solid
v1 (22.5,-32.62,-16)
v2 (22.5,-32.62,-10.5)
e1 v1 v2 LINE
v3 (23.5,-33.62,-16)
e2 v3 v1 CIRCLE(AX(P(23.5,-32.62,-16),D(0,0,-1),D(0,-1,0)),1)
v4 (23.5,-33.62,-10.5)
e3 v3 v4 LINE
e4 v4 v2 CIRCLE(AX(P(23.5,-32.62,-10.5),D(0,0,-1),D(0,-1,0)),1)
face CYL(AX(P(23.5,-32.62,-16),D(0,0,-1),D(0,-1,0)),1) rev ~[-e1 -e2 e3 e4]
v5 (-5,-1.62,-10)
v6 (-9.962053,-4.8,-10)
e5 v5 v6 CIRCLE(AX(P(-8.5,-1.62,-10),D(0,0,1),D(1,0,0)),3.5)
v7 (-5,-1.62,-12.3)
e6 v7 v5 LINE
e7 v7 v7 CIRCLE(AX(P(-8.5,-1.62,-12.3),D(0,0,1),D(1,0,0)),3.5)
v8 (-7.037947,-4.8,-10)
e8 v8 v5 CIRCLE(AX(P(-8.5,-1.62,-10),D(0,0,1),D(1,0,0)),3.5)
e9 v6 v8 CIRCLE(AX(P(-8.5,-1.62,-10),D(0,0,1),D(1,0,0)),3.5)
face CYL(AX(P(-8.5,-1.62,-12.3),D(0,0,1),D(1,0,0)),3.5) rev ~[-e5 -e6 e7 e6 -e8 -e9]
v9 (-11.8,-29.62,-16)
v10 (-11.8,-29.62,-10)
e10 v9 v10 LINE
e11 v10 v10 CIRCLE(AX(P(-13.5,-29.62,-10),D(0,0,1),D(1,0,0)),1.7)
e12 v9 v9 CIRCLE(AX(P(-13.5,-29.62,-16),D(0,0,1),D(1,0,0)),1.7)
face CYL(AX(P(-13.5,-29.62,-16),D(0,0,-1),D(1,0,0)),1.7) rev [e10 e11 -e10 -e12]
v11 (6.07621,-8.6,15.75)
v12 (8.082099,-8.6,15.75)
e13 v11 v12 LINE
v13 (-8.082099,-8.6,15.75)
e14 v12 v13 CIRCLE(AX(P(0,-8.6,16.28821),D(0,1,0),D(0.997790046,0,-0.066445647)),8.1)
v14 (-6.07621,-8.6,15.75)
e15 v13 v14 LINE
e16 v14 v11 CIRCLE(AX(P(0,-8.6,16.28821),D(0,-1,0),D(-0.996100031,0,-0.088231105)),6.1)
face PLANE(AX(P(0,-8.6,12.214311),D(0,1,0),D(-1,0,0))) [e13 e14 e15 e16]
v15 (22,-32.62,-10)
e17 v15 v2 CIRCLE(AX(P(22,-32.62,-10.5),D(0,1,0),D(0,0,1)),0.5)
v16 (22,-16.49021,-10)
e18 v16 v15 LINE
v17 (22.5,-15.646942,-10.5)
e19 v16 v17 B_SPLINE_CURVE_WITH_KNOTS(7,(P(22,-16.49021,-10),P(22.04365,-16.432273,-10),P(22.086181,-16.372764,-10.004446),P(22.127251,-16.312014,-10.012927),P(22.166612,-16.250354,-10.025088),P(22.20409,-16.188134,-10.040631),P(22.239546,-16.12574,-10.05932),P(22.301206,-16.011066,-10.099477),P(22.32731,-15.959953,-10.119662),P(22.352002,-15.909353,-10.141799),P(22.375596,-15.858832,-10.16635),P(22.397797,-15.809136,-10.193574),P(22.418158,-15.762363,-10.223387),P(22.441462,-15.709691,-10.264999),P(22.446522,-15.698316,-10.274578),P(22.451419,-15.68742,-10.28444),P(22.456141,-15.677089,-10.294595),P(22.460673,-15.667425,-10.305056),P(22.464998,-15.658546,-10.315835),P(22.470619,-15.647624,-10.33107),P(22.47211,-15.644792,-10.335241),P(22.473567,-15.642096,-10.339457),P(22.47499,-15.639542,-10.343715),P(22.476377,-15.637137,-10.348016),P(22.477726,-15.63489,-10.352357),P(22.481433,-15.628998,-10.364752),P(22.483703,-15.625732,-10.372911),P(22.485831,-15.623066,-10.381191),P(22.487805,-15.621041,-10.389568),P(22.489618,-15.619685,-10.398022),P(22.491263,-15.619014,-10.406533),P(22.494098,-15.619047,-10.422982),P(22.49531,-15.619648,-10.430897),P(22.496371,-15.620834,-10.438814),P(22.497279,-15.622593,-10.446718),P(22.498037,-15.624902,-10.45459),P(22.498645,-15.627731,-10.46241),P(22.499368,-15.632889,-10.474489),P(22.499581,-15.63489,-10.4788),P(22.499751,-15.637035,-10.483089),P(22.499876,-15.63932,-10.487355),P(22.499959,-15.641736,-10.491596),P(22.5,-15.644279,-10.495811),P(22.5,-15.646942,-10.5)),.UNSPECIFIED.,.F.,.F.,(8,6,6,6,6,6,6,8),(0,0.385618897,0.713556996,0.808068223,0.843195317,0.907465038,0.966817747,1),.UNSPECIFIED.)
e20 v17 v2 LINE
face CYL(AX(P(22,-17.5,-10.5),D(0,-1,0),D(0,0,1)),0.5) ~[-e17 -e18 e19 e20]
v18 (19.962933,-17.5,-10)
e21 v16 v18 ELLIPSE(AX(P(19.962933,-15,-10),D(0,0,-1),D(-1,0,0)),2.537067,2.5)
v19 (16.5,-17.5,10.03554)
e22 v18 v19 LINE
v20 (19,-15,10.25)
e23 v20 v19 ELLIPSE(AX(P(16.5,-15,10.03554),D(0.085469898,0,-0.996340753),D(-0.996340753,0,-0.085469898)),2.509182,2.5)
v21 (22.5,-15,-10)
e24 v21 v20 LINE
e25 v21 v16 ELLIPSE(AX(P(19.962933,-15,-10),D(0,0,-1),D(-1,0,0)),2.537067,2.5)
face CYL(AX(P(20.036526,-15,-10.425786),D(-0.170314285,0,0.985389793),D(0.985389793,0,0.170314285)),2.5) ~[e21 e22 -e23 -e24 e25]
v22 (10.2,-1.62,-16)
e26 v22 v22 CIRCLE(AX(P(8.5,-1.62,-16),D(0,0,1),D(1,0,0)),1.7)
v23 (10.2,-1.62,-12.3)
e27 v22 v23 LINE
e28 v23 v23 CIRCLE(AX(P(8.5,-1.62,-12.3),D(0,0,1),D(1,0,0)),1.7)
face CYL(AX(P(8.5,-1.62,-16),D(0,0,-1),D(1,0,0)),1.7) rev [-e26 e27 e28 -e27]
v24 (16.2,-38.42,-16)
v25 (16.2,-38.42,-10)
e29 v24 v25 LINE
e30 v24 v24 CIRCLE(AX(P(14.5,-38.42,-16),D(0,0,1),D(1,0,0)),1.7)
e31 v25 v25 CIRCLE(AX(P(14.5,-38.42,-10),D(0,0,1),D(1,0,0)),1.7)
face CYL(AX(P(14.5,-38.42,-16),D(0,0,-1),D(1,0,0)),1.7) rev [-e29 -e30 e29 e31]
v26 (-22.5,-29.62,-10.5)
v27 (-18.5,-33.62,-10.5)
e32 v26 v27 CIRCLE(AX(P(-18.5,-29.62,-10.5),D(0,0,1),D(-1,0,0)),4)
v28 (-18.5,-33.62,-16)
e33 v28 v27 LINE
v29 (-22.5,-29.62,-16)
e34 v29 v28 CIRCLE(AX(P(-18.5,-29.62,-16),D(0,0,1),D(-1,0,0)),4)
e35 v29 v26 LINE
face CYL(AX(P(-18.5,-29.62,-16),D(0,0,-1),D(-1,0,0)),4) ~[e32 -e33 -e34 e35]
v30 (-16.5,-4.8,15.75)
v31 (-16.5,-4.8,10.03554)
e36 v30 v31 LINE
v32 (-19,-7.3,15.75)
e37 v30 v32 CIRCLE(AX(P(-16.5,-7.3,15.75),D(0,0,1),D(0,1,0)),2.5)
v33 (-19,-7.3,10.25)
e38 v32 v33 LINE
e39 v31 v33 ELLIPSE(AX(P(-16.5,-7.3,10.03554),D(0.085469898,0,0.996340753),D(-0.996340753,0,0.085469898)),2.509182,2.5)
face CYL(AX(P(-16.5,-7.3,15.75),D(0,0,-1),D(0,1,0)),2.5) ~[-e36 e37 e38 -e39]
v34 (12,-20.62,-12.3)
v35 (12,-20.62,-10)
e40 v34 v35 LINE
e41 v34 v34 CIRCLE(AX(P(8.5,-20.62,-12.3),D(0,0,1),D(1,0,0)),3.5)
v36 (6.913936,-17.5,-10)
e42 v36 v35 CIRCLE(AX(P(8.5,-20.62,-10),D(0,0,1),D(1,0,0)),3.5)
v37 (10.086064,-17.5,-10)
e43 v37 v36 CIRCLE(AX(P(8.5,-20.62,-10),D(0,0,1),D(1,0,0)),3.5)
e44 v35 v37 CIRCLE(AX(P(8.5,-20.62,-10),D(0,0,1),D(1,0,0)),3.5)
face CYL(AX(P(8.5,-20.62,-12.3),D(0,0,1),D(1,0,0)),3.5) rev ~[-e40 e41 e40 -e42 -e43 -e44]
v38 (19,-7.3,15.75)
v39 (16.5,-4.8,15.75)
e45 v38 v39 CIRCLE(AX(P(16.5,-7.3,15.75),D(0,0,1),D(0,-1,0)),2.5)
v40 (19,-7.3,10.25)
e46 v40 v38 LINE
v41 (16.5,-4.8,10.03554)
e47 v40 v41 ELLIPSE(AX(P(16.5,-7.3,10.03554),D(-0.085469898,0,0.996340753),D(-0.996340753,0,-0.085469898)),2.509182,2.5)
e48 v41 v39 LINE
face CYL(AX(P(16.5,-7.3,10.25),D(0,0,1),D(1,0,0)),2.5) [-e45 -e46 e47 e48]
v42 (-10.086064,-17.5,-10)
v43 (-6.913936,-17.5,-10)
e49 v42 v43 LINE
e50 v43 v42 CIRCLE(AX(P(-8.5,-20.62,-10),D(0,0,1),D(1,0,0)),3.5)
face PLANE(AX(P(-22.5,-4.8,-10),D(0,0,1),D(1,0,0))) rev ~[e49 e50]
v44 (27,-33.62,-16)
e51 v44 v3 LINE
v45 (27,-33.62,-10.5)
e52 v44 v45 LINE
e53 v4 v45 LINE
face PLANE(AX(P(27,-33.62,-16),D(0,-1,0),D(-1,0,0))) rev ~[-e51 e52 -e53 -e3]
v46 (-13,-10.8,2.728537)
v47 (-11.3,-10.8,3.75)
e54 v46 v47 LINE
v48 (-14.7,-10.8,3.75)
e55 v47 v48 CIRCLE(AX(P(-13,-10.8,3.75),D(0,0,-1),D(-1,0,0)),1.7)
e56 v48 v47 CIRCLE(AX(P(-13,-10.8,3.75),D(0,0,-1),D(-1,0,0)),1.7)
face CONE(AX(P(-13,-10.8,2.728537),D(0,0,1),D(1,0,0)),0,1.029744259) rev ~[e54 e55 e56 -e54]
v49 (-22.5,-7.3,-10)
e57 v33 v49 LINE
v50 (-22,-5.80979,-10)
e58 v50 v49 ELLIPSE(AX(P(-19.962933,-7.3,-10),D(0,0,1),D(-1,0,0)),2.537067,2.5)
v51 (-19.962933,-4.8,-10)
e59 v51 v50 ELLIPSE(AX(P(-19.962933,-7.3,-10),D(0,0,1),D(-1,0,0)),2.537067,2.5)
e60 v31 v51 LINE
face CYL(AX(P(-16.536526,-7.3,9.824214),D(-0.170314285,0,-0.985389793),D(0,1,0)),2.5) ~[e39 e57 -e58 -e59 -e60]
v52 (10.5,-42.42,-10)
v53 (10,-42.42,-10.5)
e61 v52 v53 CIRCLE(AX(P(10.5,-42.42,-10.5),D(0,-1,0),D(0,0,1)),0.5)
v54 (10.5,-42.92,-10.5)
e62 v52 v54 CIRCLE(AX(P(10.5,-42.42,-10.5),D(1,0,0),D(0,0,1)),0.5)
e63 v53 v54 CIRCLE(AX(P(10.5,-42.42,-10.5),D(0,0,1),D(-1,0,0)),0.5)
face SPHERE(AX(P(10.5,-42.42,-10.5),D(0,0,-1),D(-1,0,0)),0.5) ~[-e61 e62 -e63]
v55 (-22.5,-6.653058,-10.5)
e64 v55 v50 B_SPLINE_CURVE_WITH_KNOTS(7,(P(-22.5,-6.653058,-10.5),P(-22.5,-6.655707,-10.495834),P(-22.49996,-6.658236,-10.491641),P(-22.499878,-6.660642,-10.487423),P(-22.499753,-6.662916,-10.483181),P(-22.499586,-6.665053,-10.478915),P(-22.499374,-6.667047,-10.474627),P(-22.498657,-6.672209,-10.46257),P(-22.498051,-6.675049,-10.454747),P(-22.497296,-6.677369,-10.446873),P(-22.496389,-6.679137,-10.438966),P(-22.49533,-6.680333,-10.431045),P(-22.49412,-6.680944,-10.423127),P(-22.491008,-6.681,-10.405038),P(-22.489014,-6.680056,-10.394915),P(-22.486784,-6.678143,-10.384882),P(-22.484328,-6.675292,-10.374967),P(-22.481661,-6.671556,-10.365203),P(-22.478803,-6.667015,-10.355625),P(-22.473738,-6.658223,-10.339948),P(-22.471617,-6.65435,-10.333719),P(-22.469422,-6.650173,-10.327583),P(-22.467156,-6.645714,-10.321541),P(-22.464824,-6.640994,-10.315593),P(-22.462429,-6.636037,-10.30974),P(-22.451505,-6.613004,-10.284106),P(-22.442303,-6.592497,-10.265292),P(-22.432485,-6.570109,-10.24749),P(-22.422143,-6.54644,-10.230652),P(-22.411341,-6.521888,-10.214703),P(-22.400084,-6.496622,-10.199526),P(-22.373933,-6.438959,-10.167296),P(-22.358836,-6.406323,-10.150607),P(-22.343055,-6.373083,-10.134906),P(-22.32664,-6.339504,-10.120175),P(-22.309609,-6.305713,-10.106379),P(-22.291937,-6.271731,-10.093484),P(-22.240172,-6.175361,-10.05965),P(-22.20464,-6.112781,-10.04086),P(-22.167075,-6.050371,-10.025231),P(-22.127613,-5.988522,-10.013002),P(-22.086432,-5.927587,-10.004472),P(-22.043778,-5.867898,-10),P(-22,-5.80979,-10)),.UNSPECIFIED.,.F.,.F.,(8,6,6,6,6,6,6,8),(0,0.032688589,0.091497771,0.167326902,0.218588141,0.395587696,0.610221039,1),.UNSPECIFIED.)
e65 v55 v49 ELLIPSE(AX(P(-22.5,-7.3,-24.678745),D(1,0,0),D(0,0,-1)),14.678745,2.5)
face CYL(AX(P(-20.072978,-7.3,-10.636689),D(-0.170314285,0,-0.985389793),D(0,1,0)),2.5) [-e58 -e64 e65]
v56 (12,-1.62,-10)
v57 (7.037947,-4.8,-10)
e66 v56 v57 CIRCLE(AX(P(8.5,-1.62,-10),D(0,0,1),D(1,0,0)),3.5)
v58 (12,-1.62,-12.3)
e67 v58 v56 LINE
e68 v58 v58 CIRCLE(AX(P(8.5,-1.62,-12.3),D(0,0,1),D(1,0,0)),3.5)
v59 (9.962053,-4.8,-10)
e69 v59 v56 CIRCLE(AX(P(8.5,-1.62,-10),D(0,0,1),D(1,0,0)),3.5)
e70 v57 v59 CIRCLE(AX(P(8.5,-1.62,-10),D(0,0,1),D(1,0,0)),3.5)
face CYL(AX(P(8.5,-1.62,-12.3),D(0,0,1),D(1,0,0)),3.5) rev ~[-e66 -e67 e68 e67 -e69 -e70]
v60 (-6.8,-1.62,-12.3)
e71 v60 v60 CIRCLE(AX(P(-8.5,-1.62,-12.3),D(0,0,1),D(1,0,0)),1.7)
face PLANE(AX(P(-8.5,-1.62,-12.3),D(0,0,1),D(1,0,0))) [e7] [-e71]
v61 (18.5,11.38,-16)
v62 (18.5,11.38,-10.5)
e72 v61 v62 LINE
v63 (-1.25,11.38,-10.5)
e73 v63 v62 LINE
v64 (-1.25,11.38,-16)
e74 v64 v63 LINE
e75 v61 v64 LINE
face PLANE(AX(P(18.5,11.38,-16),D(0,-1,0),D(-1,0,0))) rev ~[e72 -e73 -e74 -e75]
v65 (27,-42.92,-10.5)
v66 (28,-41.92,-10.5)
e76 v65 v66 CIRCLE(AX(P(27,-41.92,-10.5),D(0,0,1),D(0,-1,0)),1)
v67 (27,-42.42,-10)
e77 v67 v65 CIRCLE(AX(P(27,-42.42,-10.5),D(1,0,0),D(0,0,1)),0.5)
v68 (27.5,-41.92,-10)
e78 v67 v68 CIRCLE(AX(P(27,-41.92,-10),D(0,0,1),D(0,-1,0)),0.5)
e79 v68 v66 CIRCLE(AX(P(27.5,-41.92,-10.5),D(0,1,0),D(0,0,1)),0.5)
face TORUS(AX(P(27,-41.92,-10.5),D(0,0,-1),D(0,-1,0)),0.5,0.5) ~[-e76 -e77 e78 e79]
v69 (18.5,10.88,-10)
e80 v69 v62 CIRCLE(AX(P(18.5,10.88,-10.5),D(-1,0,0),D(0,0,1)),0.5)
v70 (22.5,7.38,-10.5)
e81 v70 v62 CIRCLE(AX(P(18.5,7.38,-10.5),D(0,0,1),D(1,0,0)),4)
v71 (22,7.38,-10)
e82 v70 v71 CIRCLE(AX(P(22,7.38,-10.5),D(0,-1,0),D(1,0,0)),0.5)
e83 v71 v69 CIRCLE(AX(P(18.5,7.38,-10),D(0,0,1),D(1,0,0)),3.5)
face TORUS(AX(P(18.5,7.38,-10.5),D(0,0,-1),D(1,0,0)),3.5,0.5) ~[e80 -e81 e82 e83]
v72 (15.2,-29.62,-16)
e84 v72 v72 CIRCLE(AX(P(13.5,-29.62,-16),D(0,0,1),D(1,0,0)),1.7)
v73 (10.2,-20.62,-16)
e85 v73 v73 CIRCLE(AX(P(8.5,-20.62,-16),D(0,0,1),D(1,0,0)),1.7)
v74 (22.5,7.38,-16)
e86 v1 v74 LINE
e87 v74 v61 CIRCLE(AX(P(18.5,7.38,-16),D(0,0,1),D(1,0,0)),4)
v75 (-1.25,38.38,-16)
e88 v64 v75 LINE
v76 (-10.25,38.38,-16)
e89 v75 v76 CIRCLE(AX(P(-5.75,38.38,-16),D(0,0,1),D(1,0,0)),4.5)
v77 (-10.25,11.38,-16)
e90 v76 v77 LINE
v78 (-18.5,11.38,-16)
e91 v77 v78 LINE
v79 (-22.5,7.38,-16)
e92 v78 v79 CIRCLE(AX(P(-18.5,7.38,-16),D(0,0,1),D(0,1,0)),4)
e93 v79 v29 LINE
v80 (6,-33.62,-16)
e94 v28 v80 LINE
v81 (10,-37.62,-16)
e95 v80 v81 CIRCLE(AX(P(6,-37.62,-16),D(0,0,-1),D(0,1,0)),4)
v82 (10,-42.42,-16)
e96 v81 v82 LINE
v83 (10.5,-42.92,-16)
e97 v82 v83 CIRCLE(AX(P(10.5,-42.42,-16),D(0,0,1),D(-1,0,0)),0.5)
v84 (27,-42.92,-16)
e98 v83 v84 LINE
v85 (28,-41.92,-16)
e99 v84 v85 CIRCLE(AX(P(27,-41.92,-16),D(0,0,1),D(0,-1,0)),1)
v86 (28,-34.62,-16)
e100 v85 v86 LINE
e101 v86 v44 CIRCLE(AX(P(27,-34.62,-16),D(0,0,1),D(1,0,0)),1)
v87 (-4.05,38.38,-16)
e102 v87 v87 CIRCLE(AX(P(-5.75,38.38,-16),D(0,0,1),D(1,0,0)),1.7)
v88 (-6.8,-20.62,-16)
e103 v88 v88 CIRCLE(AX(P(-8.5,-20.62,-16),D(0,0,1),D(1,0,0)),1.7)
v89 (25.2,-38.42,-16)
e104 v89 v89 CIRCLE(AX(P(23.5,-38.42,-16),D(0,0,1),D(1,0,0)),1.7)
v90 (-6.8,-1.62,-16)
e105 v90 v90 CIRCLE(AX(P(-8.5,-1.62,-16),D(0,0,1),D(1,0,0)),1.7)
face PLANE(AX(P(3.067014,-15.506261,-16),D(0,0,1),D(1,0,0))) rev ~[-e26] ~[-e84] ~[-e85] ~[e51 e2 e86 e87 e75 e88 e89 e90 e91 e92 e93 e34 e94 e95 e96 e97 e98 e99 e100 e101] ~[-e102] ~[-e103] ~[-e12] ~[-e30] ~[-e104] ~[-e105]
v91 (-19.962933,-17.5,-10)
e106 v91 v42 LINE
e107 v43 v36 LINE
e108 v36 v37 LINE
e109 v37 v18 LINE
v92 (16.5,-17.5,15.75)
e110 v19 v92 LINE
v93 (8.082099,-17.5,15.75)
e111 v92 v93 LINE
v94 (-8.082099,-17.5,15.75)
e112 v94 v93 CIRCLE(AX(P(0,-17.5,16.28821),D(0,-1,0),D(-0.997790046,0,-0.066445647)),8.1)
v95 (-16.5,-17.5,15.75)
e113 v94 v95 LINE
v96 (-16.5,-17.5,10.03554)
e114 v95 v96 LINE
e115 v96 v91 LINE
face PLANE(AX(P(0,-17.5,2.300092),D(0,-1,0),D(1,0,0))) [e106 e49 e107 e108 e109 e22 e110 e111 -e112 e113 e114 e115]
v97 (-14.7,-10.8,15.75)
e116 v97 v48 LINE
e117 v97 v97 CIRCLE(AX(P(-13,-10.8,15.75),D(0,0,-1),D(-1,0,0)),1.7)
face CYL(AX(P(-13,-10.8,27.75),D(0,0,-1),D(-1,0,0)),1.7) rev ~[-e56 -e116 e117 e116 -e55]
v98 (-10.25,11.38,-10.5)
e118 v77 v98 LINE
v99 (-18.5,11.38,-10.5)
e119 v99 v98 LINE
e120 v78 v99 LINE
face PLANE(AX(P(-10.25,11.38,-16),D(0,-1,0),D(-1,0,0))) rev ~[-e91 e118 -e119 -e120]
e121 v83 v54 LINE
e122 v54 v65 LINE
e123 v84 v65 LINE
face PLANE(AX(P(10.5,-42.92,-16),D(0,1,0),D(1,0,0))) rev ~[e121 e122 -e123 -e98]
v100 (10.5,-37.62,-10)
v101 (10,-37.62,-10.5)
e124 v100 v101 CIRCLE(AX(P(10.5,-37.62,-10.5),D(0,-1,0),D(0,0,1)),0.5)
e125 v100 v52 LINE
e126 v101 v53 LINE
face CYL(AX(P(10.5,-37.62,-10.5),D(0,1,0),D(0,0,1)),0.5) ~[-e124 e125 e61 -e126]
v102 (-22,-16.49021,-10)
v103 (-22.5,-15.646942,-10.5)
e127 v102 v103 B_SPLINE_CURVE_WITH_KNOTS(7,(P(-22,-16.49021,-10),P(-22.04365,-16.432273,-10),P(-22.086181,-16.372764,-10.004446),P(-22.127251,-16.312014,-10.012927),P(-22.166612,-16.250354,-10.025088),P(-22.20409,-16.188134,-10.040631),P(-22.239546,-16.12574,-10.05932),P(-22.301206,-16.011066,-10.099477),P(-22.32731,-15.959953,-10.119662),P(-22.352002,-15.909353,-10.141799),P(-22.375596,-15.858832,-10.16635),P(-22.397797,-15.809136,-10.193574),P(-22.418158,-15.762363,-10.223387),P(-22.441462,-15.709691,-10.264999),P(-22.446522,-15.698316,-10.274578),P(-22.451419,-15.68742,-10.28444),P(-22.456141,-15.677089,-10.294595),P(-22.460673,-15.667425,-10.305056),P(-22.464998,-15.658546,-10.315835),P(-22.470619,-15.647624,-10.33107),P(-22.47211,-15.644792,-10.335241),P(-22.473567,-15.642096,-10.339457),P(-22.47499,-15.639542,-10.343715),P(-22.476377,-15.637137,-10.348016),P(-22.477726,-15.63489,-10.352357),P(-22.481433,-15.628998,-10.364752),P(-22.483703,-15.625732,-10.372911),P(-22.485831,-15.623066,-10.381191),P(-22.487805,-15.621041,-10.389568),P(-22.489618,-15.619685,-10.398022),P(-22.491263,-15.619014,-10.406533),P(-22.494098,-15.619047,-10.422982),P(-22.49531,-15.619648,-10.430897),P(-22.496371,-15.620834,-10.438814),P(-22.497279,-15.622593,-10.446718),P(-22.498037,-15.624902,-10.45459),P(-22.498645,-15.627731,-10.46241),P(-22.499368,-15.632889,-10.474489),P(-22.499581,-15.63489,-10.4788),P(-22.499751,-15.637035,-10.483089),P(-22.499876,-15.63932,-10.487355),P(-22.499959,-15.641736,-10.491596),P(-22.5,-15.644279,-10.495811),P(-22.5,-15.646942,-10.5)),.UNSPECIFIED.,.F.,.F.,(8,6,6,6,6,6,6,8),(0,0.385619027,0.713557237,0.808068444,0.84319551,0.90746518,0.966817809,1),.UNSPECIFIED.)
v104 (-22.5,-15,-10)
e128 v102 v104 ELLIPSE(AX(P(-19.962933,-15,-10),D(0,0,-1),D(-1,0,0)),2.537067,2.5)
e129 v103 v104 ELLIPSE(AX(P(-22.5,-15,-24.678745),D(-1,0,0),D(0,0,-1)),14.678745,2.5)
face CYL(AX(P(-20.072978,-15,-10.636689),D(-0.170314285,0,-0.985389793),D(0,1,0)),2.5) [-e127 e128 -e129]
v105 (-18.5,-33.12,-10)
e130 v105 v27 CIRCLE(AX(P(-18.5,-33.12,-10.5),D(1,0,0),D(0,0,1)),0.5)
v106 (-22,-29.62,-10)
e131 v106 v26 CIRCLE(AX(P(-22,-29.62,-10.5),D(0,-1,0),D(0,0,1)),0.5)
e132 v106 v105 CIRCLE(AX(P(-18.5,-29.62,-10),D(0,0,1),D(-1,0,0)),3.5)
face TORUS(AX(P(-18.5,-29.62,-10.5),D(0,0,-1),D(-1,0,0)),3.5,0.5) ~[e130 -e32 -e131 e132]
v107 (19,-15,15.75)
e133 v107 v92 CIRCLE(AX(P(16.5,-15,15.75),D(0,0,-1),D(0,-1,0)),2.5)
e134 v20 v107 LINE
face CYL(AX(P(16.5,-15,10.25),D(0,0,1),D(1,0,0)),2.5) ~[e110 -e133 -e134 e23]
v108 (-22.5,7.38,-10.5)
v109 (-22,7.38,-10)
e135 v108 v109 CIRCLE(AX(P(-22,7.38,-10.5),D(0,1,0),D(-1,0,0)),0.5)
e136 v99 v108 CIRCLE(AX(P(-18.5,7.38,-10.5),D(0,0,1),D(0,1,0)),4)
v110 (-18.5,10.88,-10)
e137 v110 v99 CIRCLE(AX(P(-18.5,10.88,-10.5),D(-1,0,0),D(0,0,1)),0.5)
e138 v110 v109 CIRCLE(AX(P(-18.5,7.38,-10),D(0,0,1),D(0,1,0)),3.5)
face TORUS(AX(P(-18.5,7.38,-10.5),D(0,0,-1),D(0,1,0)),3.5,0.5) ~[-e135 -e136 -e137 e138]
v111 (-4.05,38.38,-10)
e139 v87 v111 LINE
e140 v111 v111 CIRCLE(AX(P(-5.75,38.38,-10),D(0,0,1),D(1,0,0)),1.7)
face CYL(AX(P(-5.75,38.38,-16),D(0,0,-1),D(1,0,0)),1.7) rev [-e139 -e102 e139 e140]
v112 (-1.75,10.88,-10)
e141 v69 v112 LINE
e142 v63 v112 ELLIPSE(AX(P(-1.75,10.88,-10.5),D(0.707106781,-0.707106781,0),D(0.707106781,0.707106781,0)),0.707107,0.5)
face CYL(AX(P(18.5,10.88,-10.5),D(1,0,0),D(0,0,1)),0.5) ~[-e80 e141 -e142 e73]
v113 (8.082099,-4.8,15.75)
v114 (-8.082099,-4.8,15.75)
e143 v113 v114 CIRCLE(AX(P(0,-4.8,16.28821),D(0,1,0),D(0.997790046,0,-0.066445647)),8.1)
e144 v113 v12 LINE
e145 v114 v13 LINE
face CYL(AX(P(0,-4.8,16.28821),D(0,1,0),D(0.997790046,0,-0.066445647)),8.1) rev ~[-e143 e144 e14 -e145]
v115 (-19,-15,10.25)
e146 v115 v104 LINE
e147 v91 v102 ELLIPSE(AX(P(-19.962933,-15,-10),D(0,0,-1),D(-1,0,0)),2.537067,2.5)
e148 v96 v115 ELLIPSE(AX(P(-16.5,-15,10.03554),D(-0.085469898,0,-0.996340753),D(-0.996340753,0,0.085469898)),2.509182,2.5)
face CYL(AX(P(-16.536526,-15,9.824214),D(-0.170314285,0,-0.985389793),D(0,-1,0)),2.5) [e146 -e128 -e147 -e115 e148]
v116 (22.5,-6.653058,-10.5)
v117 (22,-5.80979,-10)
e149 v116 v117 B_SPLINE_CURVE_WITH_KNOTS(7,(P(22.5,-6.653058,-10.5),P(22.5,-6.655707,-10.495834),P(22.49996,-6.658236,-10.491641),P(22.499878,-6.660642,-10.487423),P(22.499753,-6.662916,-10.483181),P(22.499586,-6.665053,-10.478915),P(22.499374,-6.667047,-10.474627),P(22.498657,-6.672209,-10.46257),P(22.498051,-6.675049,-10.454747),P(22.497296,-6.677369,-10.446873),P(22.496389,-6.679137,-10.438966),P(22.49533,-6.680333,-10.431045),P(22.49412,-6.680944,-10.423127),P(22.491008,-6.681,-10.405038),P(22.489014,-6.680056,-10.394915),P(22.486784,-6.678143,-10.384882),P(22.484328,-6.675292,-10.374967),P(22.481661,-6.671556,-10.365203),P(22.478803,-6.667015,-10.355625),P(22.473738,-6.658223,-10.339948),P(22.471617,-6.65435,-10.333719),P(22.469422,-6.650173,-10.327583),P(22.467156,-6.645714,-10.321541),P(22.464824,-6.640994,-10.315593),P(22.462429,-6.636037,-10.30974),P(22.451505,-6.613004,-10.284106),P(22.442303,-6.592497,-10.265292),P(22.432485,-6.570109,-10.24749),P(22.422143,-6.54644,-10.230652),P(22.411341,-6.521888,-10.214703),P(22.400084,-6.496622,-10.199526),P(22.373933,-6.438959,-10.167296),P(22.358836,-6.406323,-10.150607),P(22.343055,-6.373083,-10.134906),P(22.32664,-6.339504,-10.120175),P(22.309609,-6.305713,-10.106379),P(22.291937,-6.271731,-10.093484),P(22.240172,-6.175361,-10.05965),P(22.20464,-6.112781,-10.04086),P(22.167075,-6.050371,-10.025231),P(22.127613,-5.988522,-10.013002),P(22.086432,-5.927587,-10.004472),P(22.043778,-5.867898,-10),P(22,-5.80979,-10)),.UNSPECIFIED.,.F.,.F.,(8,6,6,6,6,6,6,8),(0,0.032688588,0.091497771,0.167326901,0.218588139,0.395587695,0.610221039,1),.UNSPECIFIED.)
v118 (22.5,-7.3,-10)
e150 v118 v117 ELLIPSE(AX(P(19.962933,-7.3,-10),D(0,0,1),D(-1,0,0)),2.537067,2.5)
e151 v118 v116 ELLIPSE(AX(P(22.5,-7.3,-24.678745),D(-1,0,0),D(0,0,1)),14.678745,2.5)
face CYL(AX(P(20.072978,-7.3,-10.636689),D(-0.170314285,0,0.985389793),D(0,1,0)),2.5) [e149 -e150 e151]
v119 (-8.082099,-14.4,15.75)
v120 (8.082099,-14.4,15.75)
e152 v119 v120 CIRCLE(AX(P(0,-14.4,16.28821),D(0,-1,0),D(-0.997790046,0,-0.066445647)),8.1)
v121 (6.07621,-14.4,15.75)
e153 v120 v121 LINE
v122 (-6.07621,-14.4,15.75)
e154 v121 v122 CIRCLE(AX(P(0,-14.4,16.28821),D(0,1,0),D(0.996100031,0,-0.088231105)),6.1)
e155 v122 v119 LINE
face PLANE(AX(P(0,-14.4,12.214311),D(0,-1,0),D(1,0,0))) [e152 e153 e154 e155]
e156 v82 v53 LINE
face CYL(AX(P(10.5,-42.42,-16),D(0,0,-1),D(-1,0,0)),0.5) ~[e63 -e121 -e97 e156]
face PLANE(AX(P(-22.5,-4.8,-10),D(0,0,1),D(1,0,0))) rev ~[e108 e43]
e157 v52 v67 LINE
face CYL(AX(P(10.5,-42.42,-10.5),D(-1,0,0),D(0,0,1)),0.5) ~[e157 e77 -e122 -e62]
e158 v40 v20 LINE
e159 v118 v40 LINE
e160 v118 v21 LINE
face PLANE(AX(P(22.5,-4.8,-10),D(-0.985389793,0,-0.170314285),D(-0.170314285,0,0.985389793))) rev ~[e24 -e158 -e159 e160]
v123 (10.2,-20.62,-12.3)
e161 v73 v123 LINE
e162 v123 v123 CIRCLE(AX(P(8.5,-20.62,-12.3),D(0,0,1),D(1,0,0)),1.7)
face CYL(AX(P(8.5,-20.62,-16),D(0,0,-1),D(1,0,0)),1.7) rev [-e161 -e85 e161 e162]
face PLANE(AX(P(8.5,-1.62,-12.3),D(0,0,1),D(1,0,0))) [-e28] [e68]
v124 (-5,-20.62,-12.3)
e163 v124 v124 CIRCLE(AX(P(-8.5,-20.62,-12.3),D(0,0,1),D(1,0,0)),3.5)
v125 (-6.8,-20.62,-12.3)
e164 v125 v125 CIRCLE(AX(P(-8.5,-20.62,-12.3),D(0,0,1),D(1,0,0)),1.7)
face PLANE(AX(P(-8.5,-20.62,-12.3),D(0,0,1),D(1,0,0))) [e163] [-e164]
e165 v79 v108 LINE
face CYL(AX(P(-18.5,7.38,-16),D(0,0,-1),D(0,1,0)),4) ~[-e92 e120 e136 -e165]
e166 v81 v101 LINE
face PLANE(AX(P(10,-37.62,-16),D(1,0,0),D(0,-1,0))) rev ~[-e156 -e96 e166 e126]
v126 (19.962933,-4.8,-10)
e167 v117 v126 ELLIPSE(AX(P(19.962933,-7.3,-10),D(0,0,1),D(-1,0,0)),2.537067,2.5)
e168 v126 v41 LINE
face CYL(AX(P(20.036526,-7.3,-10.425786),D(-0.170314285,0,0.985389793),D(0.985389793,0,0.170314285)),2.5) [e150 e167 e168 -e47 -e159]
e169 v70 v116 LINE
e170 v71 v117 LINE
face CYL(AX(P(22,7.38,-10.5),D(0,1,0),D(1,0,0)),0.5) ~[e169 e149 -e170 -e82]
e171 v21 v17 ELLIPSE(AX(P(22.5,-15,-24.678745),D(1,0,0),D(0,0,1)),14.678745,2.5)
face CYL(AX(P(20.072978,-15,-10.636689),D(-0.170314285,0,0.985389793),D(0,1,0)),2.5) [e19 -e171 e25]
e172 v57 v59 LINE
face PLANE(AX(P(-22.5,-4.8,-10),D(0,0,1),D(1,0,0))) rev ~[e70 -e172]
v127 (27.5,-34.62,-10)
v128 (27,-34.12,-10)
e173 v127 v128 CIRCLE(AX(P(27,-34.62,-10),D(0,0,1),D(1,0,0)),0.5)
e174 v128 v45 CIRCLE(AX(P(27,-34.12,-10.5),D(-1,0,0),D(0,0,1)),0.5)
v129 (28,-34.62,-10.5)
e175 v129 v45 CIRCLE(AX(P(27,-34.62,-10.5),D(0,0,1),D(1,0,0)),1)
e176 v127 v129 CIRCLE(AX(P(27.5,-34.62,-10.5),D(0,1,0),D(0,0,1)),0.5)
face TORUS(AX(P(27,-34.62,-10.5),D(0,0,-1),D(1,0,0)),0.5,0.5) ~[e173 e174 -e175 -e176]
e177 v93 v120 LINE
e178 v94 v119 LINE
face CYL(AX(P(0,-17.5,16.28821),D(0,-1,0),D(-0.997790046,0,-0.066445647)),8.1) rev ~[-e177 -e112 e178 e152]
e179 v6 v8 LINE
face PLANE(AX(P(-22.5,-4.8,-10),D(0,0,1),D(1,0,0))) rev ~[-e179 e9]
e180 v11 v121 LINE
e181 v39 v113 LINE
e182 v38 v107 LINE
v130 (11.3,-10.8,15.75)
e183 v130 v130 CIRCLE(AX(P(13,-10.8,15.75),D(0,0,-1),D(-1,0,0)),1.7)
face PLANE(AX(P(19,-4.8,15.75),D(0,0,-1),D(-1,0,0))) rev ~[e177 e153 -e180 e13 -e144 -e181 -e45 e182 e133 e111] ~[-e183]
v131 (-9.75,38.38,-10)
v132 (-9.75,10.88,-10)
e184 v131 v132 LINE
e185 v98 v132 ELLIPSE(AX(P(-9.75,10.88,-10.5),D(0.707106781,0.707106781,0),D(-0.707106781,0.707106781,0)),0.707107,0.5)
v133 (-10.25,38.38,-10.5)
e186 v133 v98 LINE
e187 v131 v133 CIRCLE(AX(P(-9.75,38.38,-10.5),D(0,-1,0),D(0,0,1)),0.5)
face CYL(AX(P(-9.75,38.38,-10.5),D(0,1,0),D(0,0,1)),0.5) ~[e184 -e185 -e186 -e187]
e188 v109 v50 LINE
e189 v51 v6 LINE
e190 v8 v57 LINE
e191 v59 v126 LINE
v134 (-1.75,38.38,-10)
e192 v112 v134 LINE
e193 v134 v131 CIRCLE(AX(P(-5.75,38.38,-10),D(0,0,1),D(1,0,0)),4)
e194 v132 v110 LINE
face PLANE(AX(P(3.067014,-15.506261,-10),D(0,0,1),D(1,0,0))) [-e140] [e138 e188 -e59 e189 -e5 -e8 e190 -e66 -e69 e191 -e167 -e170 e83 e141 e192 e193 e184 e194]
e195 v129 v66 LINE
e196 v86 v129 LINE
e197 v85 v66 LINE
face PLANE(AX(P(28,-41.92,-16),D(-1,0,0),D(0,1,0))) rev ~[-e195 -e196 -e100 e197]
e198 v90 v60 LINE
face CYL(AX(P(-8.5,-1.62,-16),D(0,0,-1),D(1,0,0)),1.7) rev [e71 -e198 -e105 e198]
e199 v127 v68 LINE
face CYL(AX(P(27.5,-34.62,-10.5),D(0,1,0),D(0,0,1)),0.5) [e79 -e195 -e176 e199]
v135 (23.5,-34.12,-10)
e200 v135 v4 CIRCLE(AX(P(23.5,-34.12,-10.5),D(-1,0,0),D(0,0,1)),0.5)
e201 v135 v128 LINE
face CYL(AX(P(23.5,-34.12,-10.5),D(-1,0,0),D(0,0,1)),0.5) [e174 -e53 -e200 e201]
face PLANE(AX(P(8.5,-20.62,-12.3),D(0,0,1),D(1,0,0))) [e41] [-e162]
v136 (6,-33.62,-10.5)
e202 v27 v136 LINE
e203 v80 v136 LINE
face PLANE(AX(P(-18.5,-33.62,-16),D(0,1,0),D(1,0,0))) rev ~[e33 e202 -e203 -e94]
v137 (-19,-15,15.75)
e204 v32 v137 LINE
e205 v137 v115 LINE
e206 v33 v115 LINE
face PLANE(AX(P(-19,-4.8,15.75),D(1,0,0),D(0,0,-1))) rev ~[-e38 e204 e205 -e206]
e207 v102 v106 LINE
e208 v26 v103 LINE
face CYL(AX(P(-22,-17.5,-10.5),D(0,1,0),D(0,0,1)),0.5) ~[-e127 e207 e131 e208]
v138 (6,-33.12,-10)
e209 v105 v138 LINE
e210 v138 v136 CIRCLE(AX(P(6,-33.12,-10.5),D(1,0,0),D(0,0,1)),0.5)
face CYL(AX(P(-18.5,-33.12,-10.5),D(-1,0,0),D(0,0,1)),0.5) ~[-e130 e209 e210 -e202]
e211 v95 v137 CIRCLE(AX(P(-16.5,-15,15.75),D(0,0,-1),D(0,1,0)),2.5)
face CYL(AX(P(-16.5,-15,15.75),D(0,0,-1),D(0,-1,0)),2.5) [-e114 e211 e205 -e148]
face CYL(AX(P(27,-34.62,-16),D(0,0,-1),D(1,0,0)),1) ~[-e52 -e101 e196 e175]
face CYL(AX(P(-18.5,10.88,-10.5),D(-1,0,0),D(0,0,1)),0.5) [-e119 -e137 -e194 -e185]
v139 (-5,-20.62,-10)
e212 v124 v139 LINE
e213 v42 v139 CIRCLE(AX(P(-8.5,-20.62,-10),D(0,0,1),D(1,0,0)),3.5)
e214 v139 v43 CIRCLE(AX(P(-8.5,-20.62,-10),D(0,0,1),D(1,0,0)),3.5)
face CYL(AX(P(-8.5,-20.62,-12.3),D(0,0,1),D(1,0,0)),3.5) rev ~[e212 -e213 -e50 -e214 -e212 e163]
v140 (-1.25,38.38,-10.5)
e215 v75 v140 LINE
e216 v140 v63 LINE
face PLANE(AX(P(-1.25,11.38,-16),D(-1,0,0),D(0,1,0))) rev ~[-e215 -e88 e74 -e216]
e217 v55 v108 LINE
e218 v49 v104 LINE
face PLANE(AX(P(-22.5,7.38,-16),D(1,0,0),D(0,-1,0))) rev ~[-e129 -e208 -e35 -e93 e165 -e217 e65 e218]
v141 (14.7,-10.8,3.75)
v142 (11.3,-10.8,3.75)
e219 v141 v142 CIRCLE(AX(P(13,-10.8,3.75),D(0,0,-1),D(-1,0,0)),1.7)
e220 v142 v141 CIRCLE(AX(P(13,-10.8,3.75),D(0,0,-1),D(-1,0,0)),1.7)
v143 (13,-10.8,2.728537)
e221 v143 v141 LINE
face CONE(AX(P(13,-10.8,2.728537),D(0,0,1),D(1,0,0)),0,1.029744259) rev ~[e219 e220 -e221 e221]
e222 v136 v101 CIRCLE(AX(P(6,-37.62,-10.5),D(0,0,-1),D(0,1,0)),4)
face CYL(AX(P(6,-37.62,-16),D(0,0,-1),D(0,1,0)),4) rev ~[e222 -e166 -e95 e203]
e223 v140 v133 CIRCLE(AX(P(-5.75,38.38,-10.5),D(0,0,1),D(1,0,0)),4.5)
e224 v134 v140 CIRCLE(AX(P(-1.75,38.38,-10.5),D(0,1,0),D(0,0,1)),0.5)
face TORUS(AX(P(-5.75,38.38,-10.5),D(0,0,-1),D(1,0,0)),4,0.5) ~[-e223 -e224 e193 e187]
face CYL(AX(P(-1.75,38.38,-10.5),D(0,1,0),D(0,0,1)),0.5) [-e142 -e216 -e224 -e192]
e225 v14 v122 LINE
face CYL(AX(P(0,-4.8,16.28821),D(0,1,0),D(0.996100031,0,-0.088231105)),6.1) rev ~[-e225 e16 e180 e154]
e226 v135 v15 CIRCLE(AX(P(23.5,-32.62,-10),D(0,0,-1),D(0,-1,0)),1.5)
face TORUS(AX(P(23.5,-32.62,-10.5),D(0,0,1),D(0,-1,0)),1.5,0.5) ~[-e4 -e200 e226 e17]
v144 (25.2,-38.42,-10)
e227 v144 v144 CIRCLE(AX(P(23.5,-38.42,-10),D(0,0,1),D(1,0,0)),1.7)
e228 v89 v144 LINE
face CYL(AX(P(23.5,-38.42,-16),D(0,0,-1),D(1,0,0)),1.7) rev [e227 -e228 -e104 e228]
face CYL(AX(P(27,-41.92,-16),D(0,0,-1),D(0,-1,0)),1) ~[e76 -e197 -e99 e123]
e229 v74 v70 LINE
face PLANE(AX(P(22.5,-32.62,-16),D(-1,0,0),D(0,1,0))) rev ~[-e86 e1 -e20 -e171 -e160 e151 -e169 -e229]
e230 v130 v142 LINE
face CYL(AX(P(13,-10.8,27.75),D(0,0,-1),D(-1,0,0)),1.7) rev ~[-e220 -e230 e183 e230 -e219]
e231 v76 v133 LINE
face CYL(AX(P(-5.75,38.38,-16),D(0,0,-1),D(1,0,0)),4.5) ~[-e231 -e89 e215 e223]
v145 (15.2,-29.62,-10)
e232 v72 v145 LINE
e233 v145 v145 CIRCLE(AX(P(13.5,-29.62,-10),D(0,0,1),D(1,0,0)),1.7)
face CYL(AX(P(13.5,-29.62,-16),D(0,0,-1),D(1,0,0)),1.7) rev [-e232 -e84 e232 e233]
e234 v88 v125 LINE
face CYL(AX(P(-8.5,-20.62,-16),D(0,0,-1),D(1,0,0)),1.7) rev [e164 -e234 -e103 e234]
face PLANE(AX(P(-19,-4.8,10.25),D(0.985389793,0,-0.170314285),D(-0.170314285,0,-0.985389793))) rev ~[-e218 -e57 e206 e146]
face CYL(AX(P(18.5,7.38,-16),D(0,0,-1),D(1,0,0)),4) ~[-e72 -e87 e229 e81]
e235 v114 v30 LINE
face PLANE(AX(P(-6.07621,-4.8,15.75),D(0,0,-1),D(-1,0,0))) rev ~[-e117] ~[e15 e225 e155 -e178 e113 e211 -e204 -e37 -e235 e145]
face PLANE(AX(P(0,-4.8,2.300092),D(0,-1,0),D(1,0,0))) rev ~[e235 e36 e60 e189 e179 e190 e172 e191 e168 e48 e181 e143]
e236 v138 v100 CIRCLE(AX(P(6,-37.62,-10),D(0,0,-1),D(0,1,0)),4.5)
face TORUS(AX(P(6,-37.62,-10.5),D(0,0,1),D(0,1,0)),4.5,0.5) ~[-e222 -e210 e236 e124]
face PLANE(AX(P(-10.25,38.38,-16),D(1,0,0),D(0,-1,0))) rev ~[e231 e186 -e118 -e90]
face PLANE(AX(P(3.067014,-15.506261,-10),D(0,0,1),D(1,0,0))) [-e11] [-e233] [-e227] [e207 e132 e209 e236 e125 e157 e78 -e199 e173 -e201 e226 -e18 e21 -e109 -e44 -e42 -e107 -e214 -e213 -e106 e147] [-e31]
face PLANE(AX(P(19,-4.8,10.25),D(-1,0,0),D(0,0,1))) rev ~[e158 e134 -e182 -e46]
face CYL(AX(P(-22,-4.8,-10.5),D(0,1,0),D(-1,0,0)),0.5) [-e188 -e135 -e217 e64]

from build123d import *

# Parameters (mm, degrees)
F1_R           = 1.7
F2_DEPTH       = 6
F4_D           = 3.4
F4_CBORE_D     = 7
F4_CBORE_DEPTH = 2.3
F7_DEPTH       = 12.7
F8_R           = 2.5
F9_T1_DEPTH    = 24.5
F9_T3_DEPTH    = 12.12
F9_T5_DEPTH    = 12.18
F9_T7_DEPTH    = 27
F9_T9_DEPTH    = 4.8
F9_T11_DEPTH   = 16.5
F9_T13_DEPTH   = 15.12
F9_T15_DEPTH   = 7.3
F9_T17_DEPTH   = 3.5
F9_T19_DEPTH   = 19.75
F9_T21_DEPTH   = 8.25
F9_T26_DEPTH   = 2.5
F9_S27_R       = 2.5
F9_T28_DEPTH   = 3
F9_T32_DEPTH   = 2.5
F9_S33_R       = 2.5
F9_T34_DEPTH   = 3
F9_T36_ANGLE   = 90
F9_T40_DEPTH   = 2.5
F9_S41_R       = 2.5
F9_T42_DEPTH   = 3
F9_T46_DEPTH   = 2.5
F9_S47_R       = 2.5
F9_T48_DEPTH   = 3
F9_T50_ANGLE   = 90
F9_T52_ANGLE   = 90
F9_T54_ANGLE   = 90
F9_T56_ANGLE   = 90
F9_T58_ANGLE   = 90
F9_T60_ANGLE   = 90
F9_T62_ANGLE   = 180
F9_T64_ANGLE   = 90
F9_T69_DEPTH   = 28.25
F9_T73_DEPTH   = 9.5
F9_T80_DEPTH   = 21
F9_T84_DEPTH   = 28.25
F11_D          = 3.4
F11_DEPTH      = 12
F11_TIP        = 1.0214630523
F13_DEPTH      = 3.1
F15_DEPTH      = 3.8


# Not quite as in the source:
# - a fillet or chamfer that OpenCascade refuses, or shapes differently, is made with other operations: its cross-section is extruded or revolved along the edge and cut away or added
# - a feature names something its author has since deleted; it is built from what else it names


with BuildPart() as f2:
    # F1 (on offset) → F2 (new body)
    with BuildSketch(Plane.XY.offset(-16)):
        with BuildLine():
            Line((-22.5, 7.38), (-22.5, -29.62))
            ThreePointArc((-22.5, -29.62), (-21.3284271247, -32.4484271247), (-18.5, -33.62))
            Line((-18.5, -33.62), (6, -33.62))
            ThreePointArc((6, -33.62), (8.8284271247, -34.7915728753), (10, -37.62))
            Line((10, -37.62), (10, -42.42))
            ThreePointArc((10, -42.42), (10.1464466094, -42.7735533906), (10.5, -42.92))
            Line((10.5, -42.92), (17.4366980791, -42.92))
            Line((17.4366980791, -42.92), (22, -42.92))
            Line((22, -42.92), (27, -42.92))
            ThreePointArc((27, -42.92), (27.7071067812, -42.6271067812), (28, -41.92))
            Line((28, -41.92), (28, -34.62))
            ThreePointArc((28, -34.62), (27.7071067812, -33.9128932188), (27, -33.62))
            Line((27, -33.62), (23.5, -33.62))
            ThreePointArc((23.5, -33.62), (22.7928932188, -33.3271067812), (22.5, -32.62))
            Line((22.5, -32.62), (22.5, 7.38))
            ThreePointArc((22.5, 7.38), (21.3284271247, 10.2084271247), (18.5, 11.38))
            Line((18.5, 11.38), (-1.25, 11.38))
            Line((-1.25, 11.38), (-10.25, 11.38))
            Line((-10.25, 11.38), (-18.5, 11.38))
            ThreePointArc((-18.5, 11.38), (-21.3284271247, 10.2084271247), (-22.5, 7.38))
        make_face()
        with Locations((-13.5, -29.62)):
            Circle(F1_R, mode=Mode.SUBTRACT)
        with Locations((-8.5, -20.62)):
            Circle(F1_R, mode=Mode.SUBTRACT)
        with Locations((-8.5, -1.62)):
            Circle(F1_R, mode=Mode.SUBTRACT)
        with Locations((14.5, -38.42)):
            Circle(F1_R, mode=Mode.SUBTRACT)
        with Locations((13.5, -29.62)):
            Circle(F1_R, mode=Mode.SUBTRACT)
        with Locations((23.5, -38.42)):
            Circle(F1_R, mode=Mode.SUBTRACT)
        with Locations((8.5, -20.62)):
            Circle(F1_R, mode=Mode.SUBTRACT)
        with Locations((8.5, -1.62)):
            Circle(F1_R, mode=Mode.SUBTRACT)
        with BuildLine():
            Line((-10.25, 38.38), (-10.25, 11.38))
            Line((-10.25, 11.38), (-1.25, 11.38))
            Line((-1.25, 11.38), (-1.25, 38.38))
            ThreePointArc((-1.25, 38.38), (-5.75, 42.88), (-10.25, 38.38))
        make_face()
        with Locations((-5.75, 38.38)):
            Circle(F1_R, mode=Mode.SUBTRACT)
    extrude(amount=F2_DEPTH)

    # F4 (through all)
    with Locations(Plane.XY.offset(-10)):
        with Locations((-8.5, -1.62), (8.5, -1.62), (-8.5, -20.62), (8.5, -20.62)):
            CounterBoreHole(F4_D / 2, F4_CBORE_D / 2, F4_CBORE_DEPTH)

    # F6 (on offset) → F7 (join)
    with BuildSketch(Plane.XZ.offset(4.8)):
        with BuildLine():
            Line((9.75, -10), (22.5, -10))
            Line((22.5, -10), (19, 10.25))
            Line((19, 10.25), (19, 15.75))
            Line((19, 15.75), (6.0762101901, 15.75))
            ThreePointArc((6.0762101901, 15.75), (0, 10.1882097417), (-6.0762101901, 15.75))
            Line((-6.0762101901, 15.75), (-19, 15.75))
            Line((-19, 15.75), (-19, 10.25))
            Line((-19, 10.25), (-22.5, -10))
            Line((-22.5, -10), (-9.75, -10))
            Line((-9.75, -10), (9.75, -10))
        make_face()
    extrude(amount=F7_DEPTH)

    # F8
    f8_edges = [f2.edges().sort_by_distance(p)[0] for p in [
        (20.75, -17.5, 0.125),
        (19, -17.5, 13),
        (20.75, -4.8, 0.125),
        (19, -4.8, 13),
        (-20.75, -4.8, 0.125),
        (-19, -4.8, 13),
        (-20.75, -17.5, 0.125),
        (-19, -17.5, 13),
    ]]
    fillet(f8_edges, radius=F8_R)

    # F9: fillet of radius 0.5 on 26 edges, made by hand

    # F9_s2 → F9_t1 (cut)
    with BuildSketch(Plane.YZ.offset(-18.5)):
        with BuildLine():
            ThreePointArc((-33.12, -10), (-33.4735533906, -10.1464466094), (-33.62, -10.5))
            Line((-33.62, -10.5), (-33.62, -10))
            Line((-33.62, -10), (-33.12, -10))
        make_face()
    extrude(amount=F9_T1_DEPTH, mode=Mode.SUBTRACT)

    # F9_s4 → F9_t3 (cut)
    with BuildSketch(Plane.XZ.offset(17.5)):
        with BuildLine():
            ThreePointArc((-22, -10), (-22.3535533906, -10.1464466094), (-22.5, -10.5))
            Line((-22.5, -10.5), (-22.5, -10))
            Line((-22.5, -10), (-22, -10))
        make_face()
    extrude(amount=F9_T3_DEPTH, mode=Mode.SUBTRACT)

    # F9_s6 → F9_t5 (cut)
    with BuildSketch(Plane.XZ.offset(-7.38)):
        with BuildLine():
            ThreePointArc((-22.5, -10.5), (-22.3535533906, -10.1464466094), (-22, -10))
            Line((-22, -10), (-22.5, -10))
            Line((-22.5, -10), (-22.5, -10.5))
        make_face()
        with BuildLine():
            ThreePointArc((22.5, -10.5), (22.3535533906, -10.1464466094), (22, -10))
            Line((22, -10), (22.5, -10))
            Line((22.5, -10), (22.5, -10.5))
        make_face()
    extrude(amount=F9_T5_DEPTH, mode=Mode.SUBTRACT)

    # F9_s8 → F9_t7 (cut)
    with BuildSketch(Plane.XZ.offset(-38.38)):
        with BuildLine():
            ThreePointArc((-9.75, -10), (-10.1035533906, -10.1464466094), (-10.25, -10.5))
            Line((-10.25, -10.5), (-10.25, -10))
            Line((-10.25, -10), (-9.75, -10))
        make_face()
        with BuildLine():
            ThreePointArc((-1.75, -10), (-1.3964466094, -10.1464466094), (-1.25, -10.5))
            Line((-1.25, -10.5), (-1.25, -10))
            Line((-1.25, -10), (-1.75, -10))
        make_face()
    extrude(amount=F9_T7_DEPTH, mode=Mode.SUBTRACT)

    # F9_s10 → F9_t9 (cut)
    with BuildSketch(Plane.XZ.offset(37.62)):
        with BuildLine():
            ThreePointArc((10.5, -10), (10.1464466094, -10.1464466094), (10, -10.5))
            Line((10, -10.5), (10, -10))
            Line((10, -10), (10.5, -10))
        make_face()
    extrude(amount=F9_T9_DEPTH, mode=Mode.SUBTRACT)

    # F9_s12 → F9_t11 (cut)
    with BuildSketch(Plane.YZ.offset(10.5)):
        with BuildLine():
            ThreePointArc((-42.42, -10), (-42.7735533906, -10.1464466094), (-42.92, -10.5))
            Line((-42.92, -10.5), (-42.92, -10))
            Line((-42.92, -10), (-42.42, -10))
        make_face()
    extrude(amount=F9_T11_DEPTH, mode=Mode.SUBTRACT)

    # F9_s14 → F9_t13 (cut)
    with BuildSketch(Plane.XZ.offset(17.5)):
        with BuildLine():
            ThreePointArc((22, -10), (22.3535533906, -10.1464466094), (22.5, -10.5))
            Line((22.5, -10.5), (22.5, -10))
            Line((22.5, -10), (22, -10))
        make_face()
    extrude(amount=F9_T13_DEPTH, mode=Mode.SUBTRACT)

    # F9_s16 → F9_t15 (cut)
    with BuildSketch(Plane.XZ.offset(34.62)):
        with BuildLine():
            ThreePointArc((27.5, -10), (27.8535533906, -10.1464466094), (28, -10.5))
            Line((28, -10.5), (28, -10))
            Line((28, -10), (27.5, -10))
        make_face()
    extrude(amount=F9_T15_DEPTH, mode=Mode.SUBTRACT)

    # F9_s18 → F9_t17 (cut)
    with BuildSketch(Plane.YZ.offset(23.5)):
        with BuildLine():
            ThreePointArc((-34.12, -10), (-33.7664466094, -10.1464466094), (-33.62, -10.5))
            Line((-33.62, -10.5), (-33.62, -10))
            Line((-33.62, -10), (-34.12, -10))
        make_face()
    extrude(amount=F9_T17_DEPTH, mode=Mode.SUBTRACT)

    # F9_s20 → F9_t19 (cut)
    with BuildSketch(Plane.YZ.offset(-1.25)):
        with BuildLine():
            ThreePointArc((10.88, -10), (11.2335533906, -10.1464466094), (11.38, -10.5))
            Line((11.38, -10.5), (11.38, -10))
            Line((11.38, -10), (10.88, -10))
        make_face()
    extrude(amount=F9_T19_DEPTH, mode=Mode.SUBTRACT)

    # F9_s22 → F9_t21 (cut)
    with BuildSketch(Plane.YZ.offset(-18.5)):
        with BuildLine():
            ThreePointArc((10.88, -10), (11.2335533906, -10.1464466094), (11.38, -10.5))
            Line((11.38, -10.5), (11.38, -10))
            Line((11.38, -10), (10.88, -10))
        make_face()
    extrude(amount=F9_T21_DEPTH, mode=Mode.SUBTRACT)


with BuildPart() as f9_tool24:
    # F9_s25 → F9_t26 (new body)
    with BuildSketch(Plane.XZ.offset(17.5)):
        with BuildLine():
            ThreePointArc((22, -10), (22.3535533906, -10.1464466094), (22.5, -10.5))
            Line((22.5, -10.5), (22.5, -10))
            Line((22.5, -10), (22, -10))
        make_face()
    extrude(amount=-F9_T26_DEPTH)

    # F9_s27 → F9_t28 (cut, symmetric)
    with BuildSketch(Plane(origin=(2.3673685645, 0, -13.6969181234), x_dir=(0, 1, 0), z_dir=(-0.1703142852, 0, 0.9853897931))):
        with Locations((-15, -17.9681274915)):
            Circle(F9_S27_R)
    extrude(amount=F9_T28_DEPTH, both=True, mode=Mode.SUBTRACT)


with BuildPart() as f2_1:
    add(f2.part)

    # F9_t23: cut F9_tool24
    add(f9_tool24.part, mode=Mode.SUBTRACT)


with BuildPart() as f9_tool30:
    # F9_s31 → F9_t32 (new body)
    with BuildSketch(Plane.XZ.offset(7.3)):
        with BuildLine():
            ThreePointArc((22.5, -10.5), (22.3535533906, -10.1464466094), (22, -10))
            Line((22, -10), (22.5, -10))
            Line((22.5, -10), (22.5, -10.5))
        make_face()
    extrude(amount=-F9_T32_DEPTH)

    # F9_s33 → F9_t34 (cut, symmetric)
    with BuildSketch(Plane(origin=(2.3673685645, 0, -13.6969181234), x_dir=(0, 1, 0), z_dir=(-0.1703142852, 0, 0.9853897931))):
        with Locations((-7.3, -17.9681274915)):
            Circle(F9_S33_R)
    extrude(amount=F9_T34_DEPTH, both=True, mode=Mode.SUBTRACT)


with BuildPart() as f2_2:
    add(f2_1.part)

    # F9_t29: cut F9_tool30
    add(f9_tool30.part, mode=Mode.SUBTRACT)

    # F9_s35 → F9_t36 (revolve, cut)
    with BuildSketch(Plane.XZ.offset(29.62)):
        with BuildLine():
            ThreePointArc((-22, -10), (-22.3535533906, -10.1464466094), (-22.5, -10.5))
            Line((-22.5, -10.5), (-22.5, -10))
            Line((-22.5, -10), (-22, -10))
        make_face()
    revolve(axis=Axis((-18.5, -29.62, -10), (0, 0, 1)), revolution_arc=F9_T36_ANGLE, mode=Mode.SUBTRACT)


with BuildPart() as f9_tool38:
    # F9_s39 → F9_t40 (new body)
    with BuildSketch(Plane.XZ.offset(15)):
        with BuildLine():
            ThreePointArc((-22, -10), (-22.3535533906, -10.1464466094), (-22.5, -10.5))
            Line((-22.5, -10.5), (-22.5, -10))
            Line((-22.5, -10), (-22, -10))
        make_face()
    extrude(amount=F9_T40_DEPTH)

    # F9_s41 → F9_t42 (cut, symmetric)
    with BuildSketch(Plane(origin=(-2.3673685645, 0, -13.6969181234), x_dir=(0, 1, 0), z_dir=(-0.1703142852, 0, -0.9853897931))):
        with Locations((-15, -17.9681274915)):
            Circle(F9_S41_R)
    extrude(amount=F9_T42_DEPTH, both=True, mode=Mode.SUBTRACT)


with BuildPart() as f2_3:
    add(f2_2.part)

    # F9_t37: cut F9_tool38
    add(f9_tool38.part, mode=Mode.SUBTRACT)


with BuildPart() as f9_tool44:
    # F9_s45 → F9_t46 (new body)
    with BuildSketch(Plane.XZ.offset(4.8)):
        with BuildLine():
            ThreePointArc((-22.5, -10.5), (-22.3535533906, -10.1464466094), (-22, -10))
            Line((-22, -10), (-22.5, -10))
            Line((-22.5, -10), (-22.5, -10.5))
        make_face()
    extrude(amount=F9_T46_DEPTH)

    # F9_s47 → F9_t48 (cut, symmetric)
    with BuildSketch(Plane(origin=(-2.3673685645, 0, -13.6969181234), x_dir=(0, 1, 0), z_dir=(-0.1703142852, 0, -0.9853897931))):
        with Locations((-7.3, -17.9681274915)):
            Circle(F9_S47_R)
    extrude(amount=F9_T48_DEPTH, both=True, mode=Mode.SUBTRACT)


with BuildPart() as f2_4:
    add(f2_3.part)

    # F9_t43: cut F9_tool44
    add(f9_tool44.part, mode=Mode.SUBTRACT)

    # F9_s49 → F9_t50 (revolve, cut)
    with BuildSketch(Plane.YZ.offset(6)):
        with BuildLine():
            ThreePointArc((-33.12, -10), (-33.4735533906, -10.1464466094), (-33.62, -10.5))
            Line((-33.62, -10.5), (-33.62, -10))
            Line((-33.62, -10), (-33.12, -10))
        make_face()
    revolve(axis=Axis((6, -37.62, -10), (0, 0, -1)), revolution_arc=F9_T50_ANGLE, mode=Mode.SUBTRACT)

    # F9_s51 → F9_t52 (revolve, cut)
    with BuildSketch(Plane.XZ.offset(42.42)):
        with BuildLine():
            ThreePointArc((10.5, -10), (10.1464466094, -10.1464466094), (10, -10.5))
            Line((10, -10.5), (10, -10))
            Line((10, -10), (10.5, -10))
        make_face()
    revolve(axis=Axis((10.5, -42.42, -10), (0, 0, 1)), revolution_arc=F9_T52_ANGLE, mode=Mode.SUBTRACT)

    # F9_s53 → F9_t54 (revolve, cut)
    with BuildSketch(Plane.YZ.offset(27)):
        with BuildLine():
            ThreePointArc((-42.42, -10), (-42.7735533906, -10.1464466094), (-42.92, -10.5))
            Line((-42.92, -10.5), (-42.92, -10))
            Line((-42.92, -10), (-42.42, -10))
        make_face()
    revolve(axis=Axis((27, -41.92, -10), (0, 0, 1)), revolution_arc=F9_T54_ANGLE, mode=Mode.SUBTRACT)

    # F9_s55 → F9_t56 (revolve, cut)
    with BuildSketch(Plane.YZ.offset(23.5)):
        with BuildLine():
            ThreePointArc((-34.12, -10), (-33.7664466094, -10.1464466094), (-33.62, -10.5))
            Line((-33.62, -10.5), (-33.62, -10))
            Line((-33.62, -10), (-34.12, -10))
        make_face()
    revolve(axis=Axis((23.5, -32.62, -10), (0, 0, -1)), revolution_arc=F9_T56_ANGLE, mode=Mode.SUBTRACT)

    # F9_s57 → F9_t58 (revolve, cut)
    with BuildSketch(Plane.XZ.offset(34.62)):
        with BuildLine():
            ThreePointArc((27.5, -10), (27.8535533906, -10.1464466094), (28, -10.5))
            Line((28, -10.5), (28, -10))
            Line((28, -10), (27.5, -10))
        make_face()
    revolve(axis=Axis((27, -34.62, -10), (0, 0, 1)), revolution_arc=F9_T58_ANGLE, mode=Mode.SUBTRACT)

    # F9_s59 → F9_t60 (revolve, cut)
    with BuildSketch(Plane.XZ.offset(-7.38)):
        with BuildLine():
            ThreePointArc((22, -10), (22.3535533906, -10.1464466094), (22.5, -10.5))
            Line((22.5, -10.5), (22.5, -10))
            Line((22.5, -10), (22, -10))
        make_face()
    revolve(axis=Axis((18.5, 7.38, -10), (0, 0, 1)), revolution_arc=F9_T60_ANGLE, mode=Mode.SUBTRACT)

    # F9_s61 → F9_t62 (revolve, cut)
    with BuildSketch(Plane.XZ.offset(-38.38)):
        with BuildLine():
            ThreePointArc((-1.75, -10), (-1.3964466094, -10.1464466094), (-1.25, -10.5))
            Line((-1.25, -10.5), (-1.25, -10))
            Line((-1.25, -10), (-1.75, -10))
        make_face()
    revolve(axis=Axis((-5.75, 38.38, -10), (0, 0, 1)), revolution_arc=F9_T62_ANGLE, mode=Mode.SUBTRACT)

    # F9_s63 → F9_t64 (revolve, cut)
    with BuildSketch(Plane.YZ.offset(-18.5)):
        with BuildLine():
            ThreePointArc((10.88, -10), (11.2335533906, -10.1464466094), (11.38, -10.5))
            Line((11.38, -10.5), (11.38, -10))
            Line((11.38, -10), (10.88, -10))
        make_face()
    revolve(axis=Axis((-18.5, 7.38, -10), (0, 0, 1)), revolution_arc=F9_T64_ANGLE, mode=Mode.SUBTRACT)


with BuildPart() as f9_tool67:
    # F9_s68 → F9_t69 (new body)
    with BuildSketch(Plane.XZ.offset(-38.38)):
        with BuildLine():
            ThreePointArc((-9.75, -10), (-10.1035533906, -10.1464466094), (-10.25, -10.5))
            Line((-10.25, -10.5), (-10.25, -10))
            Line((-10.25, -10), (-9.75, -10))
        make_face()
    extrude(amount=F9_T69_DEPTH)

    split(bisect_by=Plane.XZ.offset(-11.38), keep=Keep.TOP)


with BuildPart() as f9_tool71:
    # F9_s72 → F9_t73 (new body)
    with BuildSketch(Plane.YZ.offset(-9)):
        with BuildLine():
            ThreePointArc((10.88, -10), (11.2335533906, -10.1464466094), (11.38, -10.5))
            Line((11.38, -10.5), (11.38, -10))
            Line((11.38, -10), (10.88, -10))
        make_face()
    extrude(amount=-F9_T73_DEPTH)

    split(bisect_by=Plane.YZ.offset(-10.25), keep=Keep.TOP)


with BuildPart() as f9_tool67_1:
    add(f9_tool67.part)

    # F9_t75: intersect F9_tool71
    add(f9_tool71.part, mode=Mode.INTERSECT)


with BuildPart() as f2_5:
    add(f2_4.part)

    # F9_t65: cut F9_tool67
    add(f9_tool67_1.part, mode=Mode.SUBTRACT)


with BuildPart() as f9_tool78:
    # F9_s79 → F9_t80 (new body)
    with BuildSketch(Plane.YZ.offset(18.5)):
        with BuildLine():
            ThreePointArc((10.88, -10), (11.2335533906, -10.1464466094), (11.38, -10.5))
            Line((11.38, -10.5), (11.38, -10))
            Line((11.38, -10), (10.88, -10))
        make_face()
    extrude(amount=-F9_T80_DEPTH)

    split(bisect_by=Plane.YZ.offset(-1.25), keep=Keep.BOTTOM)


with BuildPart() as f9_tool82:
    # F9_s83 → F9_t84 (new body)
    with BuildSketch(Plane.XZ.offset(-10.13)):
        with BuildLine():
            ThreePointArc((-1.75, -10), (-1.3964466094, -10.1464466094), (-1.25, -10.5))
            Line((-1.25, -10.5), (-1.25, -10))
            Line((-1.25, -10), (-1.75, -10))
        make_face()
    extrude(amount=-F9_T84_DEPTH)

    split(bisect_by=Plane.XZ.offset(-11.38), keep=Keep.TOP)


with BuildPart() as f9_tool78_1:
    add(f9_tool78.part)

    # F9_t86: intersect F9_tool82
    add(f9_tool82.part, mode=Mode.INTERSECT)


with BuildPart() as f2_6:
    add(f2_5.part)

    # F9_t76: cut F9_tool78
    add(f9_tool78_1.part, mode=Mode.SUBTRACT)

    # F11
    with Locations(Plane.XY.offset(15.75)):
        with Locations((-13, -10.8), (13, -10.8)):
            Hole(F11_D / 2, depth=F11_DEPTH)
            with Locations((0, 0, -(F11_DEPTH + F11_TIP / 2))):  # 118° drill point
                Cone(0, F11_D / 2, F11_TIP, mode=Mode.SUBTRACT)

    # F12 (on face) → F13 (cut)
    with BuildSketch(Plane.XZ.offset(17.5)):
        with BuildLine():
            ThreePointArc((6.0762101901, 15.75), (0, 10.1882097417), (-6.0762101901, 15.75))
            Line((-6.0762101901, 15.75), (-8.0820993729, 15.75))
            ThreePointArc((-8.0820993729, 15.75), (0, 8.1882097417), (8.0820993729, 15.75))
            Line((8.0820993729, 15.75), (6.0762101901, 15.75))
        make_face()
    extrude(amount=-F13_DEPTH, mode=Mode.SUBTRACT)

    # F14 (on face) → F15 (cut)
    with BuildSketch(Plane(origin=(0, -4.8, 0), x_dir=(-1, 0, 0), z_dir=(0, 1, 0))):
        with BuildLine():
            Line((8.0820993729, 15.75), (6.0762101901, 15.75))
            ThreePointArc((6.0762101901, 15.75), (0, 10.1882097417), (-6.0762101901, 15.75))
            Line((-6.0762101901, 15.75), (-8.0820993729, 15.75))
            ThreePointArc((-8.0820993729, 15.75), (0, 8.1882097417), (8.0820993729, 15.75))
        make_face()
    extrude(amount=-F15_DEPTH, mode=Mode.SUBTRACT)


solid = f2_6.part
